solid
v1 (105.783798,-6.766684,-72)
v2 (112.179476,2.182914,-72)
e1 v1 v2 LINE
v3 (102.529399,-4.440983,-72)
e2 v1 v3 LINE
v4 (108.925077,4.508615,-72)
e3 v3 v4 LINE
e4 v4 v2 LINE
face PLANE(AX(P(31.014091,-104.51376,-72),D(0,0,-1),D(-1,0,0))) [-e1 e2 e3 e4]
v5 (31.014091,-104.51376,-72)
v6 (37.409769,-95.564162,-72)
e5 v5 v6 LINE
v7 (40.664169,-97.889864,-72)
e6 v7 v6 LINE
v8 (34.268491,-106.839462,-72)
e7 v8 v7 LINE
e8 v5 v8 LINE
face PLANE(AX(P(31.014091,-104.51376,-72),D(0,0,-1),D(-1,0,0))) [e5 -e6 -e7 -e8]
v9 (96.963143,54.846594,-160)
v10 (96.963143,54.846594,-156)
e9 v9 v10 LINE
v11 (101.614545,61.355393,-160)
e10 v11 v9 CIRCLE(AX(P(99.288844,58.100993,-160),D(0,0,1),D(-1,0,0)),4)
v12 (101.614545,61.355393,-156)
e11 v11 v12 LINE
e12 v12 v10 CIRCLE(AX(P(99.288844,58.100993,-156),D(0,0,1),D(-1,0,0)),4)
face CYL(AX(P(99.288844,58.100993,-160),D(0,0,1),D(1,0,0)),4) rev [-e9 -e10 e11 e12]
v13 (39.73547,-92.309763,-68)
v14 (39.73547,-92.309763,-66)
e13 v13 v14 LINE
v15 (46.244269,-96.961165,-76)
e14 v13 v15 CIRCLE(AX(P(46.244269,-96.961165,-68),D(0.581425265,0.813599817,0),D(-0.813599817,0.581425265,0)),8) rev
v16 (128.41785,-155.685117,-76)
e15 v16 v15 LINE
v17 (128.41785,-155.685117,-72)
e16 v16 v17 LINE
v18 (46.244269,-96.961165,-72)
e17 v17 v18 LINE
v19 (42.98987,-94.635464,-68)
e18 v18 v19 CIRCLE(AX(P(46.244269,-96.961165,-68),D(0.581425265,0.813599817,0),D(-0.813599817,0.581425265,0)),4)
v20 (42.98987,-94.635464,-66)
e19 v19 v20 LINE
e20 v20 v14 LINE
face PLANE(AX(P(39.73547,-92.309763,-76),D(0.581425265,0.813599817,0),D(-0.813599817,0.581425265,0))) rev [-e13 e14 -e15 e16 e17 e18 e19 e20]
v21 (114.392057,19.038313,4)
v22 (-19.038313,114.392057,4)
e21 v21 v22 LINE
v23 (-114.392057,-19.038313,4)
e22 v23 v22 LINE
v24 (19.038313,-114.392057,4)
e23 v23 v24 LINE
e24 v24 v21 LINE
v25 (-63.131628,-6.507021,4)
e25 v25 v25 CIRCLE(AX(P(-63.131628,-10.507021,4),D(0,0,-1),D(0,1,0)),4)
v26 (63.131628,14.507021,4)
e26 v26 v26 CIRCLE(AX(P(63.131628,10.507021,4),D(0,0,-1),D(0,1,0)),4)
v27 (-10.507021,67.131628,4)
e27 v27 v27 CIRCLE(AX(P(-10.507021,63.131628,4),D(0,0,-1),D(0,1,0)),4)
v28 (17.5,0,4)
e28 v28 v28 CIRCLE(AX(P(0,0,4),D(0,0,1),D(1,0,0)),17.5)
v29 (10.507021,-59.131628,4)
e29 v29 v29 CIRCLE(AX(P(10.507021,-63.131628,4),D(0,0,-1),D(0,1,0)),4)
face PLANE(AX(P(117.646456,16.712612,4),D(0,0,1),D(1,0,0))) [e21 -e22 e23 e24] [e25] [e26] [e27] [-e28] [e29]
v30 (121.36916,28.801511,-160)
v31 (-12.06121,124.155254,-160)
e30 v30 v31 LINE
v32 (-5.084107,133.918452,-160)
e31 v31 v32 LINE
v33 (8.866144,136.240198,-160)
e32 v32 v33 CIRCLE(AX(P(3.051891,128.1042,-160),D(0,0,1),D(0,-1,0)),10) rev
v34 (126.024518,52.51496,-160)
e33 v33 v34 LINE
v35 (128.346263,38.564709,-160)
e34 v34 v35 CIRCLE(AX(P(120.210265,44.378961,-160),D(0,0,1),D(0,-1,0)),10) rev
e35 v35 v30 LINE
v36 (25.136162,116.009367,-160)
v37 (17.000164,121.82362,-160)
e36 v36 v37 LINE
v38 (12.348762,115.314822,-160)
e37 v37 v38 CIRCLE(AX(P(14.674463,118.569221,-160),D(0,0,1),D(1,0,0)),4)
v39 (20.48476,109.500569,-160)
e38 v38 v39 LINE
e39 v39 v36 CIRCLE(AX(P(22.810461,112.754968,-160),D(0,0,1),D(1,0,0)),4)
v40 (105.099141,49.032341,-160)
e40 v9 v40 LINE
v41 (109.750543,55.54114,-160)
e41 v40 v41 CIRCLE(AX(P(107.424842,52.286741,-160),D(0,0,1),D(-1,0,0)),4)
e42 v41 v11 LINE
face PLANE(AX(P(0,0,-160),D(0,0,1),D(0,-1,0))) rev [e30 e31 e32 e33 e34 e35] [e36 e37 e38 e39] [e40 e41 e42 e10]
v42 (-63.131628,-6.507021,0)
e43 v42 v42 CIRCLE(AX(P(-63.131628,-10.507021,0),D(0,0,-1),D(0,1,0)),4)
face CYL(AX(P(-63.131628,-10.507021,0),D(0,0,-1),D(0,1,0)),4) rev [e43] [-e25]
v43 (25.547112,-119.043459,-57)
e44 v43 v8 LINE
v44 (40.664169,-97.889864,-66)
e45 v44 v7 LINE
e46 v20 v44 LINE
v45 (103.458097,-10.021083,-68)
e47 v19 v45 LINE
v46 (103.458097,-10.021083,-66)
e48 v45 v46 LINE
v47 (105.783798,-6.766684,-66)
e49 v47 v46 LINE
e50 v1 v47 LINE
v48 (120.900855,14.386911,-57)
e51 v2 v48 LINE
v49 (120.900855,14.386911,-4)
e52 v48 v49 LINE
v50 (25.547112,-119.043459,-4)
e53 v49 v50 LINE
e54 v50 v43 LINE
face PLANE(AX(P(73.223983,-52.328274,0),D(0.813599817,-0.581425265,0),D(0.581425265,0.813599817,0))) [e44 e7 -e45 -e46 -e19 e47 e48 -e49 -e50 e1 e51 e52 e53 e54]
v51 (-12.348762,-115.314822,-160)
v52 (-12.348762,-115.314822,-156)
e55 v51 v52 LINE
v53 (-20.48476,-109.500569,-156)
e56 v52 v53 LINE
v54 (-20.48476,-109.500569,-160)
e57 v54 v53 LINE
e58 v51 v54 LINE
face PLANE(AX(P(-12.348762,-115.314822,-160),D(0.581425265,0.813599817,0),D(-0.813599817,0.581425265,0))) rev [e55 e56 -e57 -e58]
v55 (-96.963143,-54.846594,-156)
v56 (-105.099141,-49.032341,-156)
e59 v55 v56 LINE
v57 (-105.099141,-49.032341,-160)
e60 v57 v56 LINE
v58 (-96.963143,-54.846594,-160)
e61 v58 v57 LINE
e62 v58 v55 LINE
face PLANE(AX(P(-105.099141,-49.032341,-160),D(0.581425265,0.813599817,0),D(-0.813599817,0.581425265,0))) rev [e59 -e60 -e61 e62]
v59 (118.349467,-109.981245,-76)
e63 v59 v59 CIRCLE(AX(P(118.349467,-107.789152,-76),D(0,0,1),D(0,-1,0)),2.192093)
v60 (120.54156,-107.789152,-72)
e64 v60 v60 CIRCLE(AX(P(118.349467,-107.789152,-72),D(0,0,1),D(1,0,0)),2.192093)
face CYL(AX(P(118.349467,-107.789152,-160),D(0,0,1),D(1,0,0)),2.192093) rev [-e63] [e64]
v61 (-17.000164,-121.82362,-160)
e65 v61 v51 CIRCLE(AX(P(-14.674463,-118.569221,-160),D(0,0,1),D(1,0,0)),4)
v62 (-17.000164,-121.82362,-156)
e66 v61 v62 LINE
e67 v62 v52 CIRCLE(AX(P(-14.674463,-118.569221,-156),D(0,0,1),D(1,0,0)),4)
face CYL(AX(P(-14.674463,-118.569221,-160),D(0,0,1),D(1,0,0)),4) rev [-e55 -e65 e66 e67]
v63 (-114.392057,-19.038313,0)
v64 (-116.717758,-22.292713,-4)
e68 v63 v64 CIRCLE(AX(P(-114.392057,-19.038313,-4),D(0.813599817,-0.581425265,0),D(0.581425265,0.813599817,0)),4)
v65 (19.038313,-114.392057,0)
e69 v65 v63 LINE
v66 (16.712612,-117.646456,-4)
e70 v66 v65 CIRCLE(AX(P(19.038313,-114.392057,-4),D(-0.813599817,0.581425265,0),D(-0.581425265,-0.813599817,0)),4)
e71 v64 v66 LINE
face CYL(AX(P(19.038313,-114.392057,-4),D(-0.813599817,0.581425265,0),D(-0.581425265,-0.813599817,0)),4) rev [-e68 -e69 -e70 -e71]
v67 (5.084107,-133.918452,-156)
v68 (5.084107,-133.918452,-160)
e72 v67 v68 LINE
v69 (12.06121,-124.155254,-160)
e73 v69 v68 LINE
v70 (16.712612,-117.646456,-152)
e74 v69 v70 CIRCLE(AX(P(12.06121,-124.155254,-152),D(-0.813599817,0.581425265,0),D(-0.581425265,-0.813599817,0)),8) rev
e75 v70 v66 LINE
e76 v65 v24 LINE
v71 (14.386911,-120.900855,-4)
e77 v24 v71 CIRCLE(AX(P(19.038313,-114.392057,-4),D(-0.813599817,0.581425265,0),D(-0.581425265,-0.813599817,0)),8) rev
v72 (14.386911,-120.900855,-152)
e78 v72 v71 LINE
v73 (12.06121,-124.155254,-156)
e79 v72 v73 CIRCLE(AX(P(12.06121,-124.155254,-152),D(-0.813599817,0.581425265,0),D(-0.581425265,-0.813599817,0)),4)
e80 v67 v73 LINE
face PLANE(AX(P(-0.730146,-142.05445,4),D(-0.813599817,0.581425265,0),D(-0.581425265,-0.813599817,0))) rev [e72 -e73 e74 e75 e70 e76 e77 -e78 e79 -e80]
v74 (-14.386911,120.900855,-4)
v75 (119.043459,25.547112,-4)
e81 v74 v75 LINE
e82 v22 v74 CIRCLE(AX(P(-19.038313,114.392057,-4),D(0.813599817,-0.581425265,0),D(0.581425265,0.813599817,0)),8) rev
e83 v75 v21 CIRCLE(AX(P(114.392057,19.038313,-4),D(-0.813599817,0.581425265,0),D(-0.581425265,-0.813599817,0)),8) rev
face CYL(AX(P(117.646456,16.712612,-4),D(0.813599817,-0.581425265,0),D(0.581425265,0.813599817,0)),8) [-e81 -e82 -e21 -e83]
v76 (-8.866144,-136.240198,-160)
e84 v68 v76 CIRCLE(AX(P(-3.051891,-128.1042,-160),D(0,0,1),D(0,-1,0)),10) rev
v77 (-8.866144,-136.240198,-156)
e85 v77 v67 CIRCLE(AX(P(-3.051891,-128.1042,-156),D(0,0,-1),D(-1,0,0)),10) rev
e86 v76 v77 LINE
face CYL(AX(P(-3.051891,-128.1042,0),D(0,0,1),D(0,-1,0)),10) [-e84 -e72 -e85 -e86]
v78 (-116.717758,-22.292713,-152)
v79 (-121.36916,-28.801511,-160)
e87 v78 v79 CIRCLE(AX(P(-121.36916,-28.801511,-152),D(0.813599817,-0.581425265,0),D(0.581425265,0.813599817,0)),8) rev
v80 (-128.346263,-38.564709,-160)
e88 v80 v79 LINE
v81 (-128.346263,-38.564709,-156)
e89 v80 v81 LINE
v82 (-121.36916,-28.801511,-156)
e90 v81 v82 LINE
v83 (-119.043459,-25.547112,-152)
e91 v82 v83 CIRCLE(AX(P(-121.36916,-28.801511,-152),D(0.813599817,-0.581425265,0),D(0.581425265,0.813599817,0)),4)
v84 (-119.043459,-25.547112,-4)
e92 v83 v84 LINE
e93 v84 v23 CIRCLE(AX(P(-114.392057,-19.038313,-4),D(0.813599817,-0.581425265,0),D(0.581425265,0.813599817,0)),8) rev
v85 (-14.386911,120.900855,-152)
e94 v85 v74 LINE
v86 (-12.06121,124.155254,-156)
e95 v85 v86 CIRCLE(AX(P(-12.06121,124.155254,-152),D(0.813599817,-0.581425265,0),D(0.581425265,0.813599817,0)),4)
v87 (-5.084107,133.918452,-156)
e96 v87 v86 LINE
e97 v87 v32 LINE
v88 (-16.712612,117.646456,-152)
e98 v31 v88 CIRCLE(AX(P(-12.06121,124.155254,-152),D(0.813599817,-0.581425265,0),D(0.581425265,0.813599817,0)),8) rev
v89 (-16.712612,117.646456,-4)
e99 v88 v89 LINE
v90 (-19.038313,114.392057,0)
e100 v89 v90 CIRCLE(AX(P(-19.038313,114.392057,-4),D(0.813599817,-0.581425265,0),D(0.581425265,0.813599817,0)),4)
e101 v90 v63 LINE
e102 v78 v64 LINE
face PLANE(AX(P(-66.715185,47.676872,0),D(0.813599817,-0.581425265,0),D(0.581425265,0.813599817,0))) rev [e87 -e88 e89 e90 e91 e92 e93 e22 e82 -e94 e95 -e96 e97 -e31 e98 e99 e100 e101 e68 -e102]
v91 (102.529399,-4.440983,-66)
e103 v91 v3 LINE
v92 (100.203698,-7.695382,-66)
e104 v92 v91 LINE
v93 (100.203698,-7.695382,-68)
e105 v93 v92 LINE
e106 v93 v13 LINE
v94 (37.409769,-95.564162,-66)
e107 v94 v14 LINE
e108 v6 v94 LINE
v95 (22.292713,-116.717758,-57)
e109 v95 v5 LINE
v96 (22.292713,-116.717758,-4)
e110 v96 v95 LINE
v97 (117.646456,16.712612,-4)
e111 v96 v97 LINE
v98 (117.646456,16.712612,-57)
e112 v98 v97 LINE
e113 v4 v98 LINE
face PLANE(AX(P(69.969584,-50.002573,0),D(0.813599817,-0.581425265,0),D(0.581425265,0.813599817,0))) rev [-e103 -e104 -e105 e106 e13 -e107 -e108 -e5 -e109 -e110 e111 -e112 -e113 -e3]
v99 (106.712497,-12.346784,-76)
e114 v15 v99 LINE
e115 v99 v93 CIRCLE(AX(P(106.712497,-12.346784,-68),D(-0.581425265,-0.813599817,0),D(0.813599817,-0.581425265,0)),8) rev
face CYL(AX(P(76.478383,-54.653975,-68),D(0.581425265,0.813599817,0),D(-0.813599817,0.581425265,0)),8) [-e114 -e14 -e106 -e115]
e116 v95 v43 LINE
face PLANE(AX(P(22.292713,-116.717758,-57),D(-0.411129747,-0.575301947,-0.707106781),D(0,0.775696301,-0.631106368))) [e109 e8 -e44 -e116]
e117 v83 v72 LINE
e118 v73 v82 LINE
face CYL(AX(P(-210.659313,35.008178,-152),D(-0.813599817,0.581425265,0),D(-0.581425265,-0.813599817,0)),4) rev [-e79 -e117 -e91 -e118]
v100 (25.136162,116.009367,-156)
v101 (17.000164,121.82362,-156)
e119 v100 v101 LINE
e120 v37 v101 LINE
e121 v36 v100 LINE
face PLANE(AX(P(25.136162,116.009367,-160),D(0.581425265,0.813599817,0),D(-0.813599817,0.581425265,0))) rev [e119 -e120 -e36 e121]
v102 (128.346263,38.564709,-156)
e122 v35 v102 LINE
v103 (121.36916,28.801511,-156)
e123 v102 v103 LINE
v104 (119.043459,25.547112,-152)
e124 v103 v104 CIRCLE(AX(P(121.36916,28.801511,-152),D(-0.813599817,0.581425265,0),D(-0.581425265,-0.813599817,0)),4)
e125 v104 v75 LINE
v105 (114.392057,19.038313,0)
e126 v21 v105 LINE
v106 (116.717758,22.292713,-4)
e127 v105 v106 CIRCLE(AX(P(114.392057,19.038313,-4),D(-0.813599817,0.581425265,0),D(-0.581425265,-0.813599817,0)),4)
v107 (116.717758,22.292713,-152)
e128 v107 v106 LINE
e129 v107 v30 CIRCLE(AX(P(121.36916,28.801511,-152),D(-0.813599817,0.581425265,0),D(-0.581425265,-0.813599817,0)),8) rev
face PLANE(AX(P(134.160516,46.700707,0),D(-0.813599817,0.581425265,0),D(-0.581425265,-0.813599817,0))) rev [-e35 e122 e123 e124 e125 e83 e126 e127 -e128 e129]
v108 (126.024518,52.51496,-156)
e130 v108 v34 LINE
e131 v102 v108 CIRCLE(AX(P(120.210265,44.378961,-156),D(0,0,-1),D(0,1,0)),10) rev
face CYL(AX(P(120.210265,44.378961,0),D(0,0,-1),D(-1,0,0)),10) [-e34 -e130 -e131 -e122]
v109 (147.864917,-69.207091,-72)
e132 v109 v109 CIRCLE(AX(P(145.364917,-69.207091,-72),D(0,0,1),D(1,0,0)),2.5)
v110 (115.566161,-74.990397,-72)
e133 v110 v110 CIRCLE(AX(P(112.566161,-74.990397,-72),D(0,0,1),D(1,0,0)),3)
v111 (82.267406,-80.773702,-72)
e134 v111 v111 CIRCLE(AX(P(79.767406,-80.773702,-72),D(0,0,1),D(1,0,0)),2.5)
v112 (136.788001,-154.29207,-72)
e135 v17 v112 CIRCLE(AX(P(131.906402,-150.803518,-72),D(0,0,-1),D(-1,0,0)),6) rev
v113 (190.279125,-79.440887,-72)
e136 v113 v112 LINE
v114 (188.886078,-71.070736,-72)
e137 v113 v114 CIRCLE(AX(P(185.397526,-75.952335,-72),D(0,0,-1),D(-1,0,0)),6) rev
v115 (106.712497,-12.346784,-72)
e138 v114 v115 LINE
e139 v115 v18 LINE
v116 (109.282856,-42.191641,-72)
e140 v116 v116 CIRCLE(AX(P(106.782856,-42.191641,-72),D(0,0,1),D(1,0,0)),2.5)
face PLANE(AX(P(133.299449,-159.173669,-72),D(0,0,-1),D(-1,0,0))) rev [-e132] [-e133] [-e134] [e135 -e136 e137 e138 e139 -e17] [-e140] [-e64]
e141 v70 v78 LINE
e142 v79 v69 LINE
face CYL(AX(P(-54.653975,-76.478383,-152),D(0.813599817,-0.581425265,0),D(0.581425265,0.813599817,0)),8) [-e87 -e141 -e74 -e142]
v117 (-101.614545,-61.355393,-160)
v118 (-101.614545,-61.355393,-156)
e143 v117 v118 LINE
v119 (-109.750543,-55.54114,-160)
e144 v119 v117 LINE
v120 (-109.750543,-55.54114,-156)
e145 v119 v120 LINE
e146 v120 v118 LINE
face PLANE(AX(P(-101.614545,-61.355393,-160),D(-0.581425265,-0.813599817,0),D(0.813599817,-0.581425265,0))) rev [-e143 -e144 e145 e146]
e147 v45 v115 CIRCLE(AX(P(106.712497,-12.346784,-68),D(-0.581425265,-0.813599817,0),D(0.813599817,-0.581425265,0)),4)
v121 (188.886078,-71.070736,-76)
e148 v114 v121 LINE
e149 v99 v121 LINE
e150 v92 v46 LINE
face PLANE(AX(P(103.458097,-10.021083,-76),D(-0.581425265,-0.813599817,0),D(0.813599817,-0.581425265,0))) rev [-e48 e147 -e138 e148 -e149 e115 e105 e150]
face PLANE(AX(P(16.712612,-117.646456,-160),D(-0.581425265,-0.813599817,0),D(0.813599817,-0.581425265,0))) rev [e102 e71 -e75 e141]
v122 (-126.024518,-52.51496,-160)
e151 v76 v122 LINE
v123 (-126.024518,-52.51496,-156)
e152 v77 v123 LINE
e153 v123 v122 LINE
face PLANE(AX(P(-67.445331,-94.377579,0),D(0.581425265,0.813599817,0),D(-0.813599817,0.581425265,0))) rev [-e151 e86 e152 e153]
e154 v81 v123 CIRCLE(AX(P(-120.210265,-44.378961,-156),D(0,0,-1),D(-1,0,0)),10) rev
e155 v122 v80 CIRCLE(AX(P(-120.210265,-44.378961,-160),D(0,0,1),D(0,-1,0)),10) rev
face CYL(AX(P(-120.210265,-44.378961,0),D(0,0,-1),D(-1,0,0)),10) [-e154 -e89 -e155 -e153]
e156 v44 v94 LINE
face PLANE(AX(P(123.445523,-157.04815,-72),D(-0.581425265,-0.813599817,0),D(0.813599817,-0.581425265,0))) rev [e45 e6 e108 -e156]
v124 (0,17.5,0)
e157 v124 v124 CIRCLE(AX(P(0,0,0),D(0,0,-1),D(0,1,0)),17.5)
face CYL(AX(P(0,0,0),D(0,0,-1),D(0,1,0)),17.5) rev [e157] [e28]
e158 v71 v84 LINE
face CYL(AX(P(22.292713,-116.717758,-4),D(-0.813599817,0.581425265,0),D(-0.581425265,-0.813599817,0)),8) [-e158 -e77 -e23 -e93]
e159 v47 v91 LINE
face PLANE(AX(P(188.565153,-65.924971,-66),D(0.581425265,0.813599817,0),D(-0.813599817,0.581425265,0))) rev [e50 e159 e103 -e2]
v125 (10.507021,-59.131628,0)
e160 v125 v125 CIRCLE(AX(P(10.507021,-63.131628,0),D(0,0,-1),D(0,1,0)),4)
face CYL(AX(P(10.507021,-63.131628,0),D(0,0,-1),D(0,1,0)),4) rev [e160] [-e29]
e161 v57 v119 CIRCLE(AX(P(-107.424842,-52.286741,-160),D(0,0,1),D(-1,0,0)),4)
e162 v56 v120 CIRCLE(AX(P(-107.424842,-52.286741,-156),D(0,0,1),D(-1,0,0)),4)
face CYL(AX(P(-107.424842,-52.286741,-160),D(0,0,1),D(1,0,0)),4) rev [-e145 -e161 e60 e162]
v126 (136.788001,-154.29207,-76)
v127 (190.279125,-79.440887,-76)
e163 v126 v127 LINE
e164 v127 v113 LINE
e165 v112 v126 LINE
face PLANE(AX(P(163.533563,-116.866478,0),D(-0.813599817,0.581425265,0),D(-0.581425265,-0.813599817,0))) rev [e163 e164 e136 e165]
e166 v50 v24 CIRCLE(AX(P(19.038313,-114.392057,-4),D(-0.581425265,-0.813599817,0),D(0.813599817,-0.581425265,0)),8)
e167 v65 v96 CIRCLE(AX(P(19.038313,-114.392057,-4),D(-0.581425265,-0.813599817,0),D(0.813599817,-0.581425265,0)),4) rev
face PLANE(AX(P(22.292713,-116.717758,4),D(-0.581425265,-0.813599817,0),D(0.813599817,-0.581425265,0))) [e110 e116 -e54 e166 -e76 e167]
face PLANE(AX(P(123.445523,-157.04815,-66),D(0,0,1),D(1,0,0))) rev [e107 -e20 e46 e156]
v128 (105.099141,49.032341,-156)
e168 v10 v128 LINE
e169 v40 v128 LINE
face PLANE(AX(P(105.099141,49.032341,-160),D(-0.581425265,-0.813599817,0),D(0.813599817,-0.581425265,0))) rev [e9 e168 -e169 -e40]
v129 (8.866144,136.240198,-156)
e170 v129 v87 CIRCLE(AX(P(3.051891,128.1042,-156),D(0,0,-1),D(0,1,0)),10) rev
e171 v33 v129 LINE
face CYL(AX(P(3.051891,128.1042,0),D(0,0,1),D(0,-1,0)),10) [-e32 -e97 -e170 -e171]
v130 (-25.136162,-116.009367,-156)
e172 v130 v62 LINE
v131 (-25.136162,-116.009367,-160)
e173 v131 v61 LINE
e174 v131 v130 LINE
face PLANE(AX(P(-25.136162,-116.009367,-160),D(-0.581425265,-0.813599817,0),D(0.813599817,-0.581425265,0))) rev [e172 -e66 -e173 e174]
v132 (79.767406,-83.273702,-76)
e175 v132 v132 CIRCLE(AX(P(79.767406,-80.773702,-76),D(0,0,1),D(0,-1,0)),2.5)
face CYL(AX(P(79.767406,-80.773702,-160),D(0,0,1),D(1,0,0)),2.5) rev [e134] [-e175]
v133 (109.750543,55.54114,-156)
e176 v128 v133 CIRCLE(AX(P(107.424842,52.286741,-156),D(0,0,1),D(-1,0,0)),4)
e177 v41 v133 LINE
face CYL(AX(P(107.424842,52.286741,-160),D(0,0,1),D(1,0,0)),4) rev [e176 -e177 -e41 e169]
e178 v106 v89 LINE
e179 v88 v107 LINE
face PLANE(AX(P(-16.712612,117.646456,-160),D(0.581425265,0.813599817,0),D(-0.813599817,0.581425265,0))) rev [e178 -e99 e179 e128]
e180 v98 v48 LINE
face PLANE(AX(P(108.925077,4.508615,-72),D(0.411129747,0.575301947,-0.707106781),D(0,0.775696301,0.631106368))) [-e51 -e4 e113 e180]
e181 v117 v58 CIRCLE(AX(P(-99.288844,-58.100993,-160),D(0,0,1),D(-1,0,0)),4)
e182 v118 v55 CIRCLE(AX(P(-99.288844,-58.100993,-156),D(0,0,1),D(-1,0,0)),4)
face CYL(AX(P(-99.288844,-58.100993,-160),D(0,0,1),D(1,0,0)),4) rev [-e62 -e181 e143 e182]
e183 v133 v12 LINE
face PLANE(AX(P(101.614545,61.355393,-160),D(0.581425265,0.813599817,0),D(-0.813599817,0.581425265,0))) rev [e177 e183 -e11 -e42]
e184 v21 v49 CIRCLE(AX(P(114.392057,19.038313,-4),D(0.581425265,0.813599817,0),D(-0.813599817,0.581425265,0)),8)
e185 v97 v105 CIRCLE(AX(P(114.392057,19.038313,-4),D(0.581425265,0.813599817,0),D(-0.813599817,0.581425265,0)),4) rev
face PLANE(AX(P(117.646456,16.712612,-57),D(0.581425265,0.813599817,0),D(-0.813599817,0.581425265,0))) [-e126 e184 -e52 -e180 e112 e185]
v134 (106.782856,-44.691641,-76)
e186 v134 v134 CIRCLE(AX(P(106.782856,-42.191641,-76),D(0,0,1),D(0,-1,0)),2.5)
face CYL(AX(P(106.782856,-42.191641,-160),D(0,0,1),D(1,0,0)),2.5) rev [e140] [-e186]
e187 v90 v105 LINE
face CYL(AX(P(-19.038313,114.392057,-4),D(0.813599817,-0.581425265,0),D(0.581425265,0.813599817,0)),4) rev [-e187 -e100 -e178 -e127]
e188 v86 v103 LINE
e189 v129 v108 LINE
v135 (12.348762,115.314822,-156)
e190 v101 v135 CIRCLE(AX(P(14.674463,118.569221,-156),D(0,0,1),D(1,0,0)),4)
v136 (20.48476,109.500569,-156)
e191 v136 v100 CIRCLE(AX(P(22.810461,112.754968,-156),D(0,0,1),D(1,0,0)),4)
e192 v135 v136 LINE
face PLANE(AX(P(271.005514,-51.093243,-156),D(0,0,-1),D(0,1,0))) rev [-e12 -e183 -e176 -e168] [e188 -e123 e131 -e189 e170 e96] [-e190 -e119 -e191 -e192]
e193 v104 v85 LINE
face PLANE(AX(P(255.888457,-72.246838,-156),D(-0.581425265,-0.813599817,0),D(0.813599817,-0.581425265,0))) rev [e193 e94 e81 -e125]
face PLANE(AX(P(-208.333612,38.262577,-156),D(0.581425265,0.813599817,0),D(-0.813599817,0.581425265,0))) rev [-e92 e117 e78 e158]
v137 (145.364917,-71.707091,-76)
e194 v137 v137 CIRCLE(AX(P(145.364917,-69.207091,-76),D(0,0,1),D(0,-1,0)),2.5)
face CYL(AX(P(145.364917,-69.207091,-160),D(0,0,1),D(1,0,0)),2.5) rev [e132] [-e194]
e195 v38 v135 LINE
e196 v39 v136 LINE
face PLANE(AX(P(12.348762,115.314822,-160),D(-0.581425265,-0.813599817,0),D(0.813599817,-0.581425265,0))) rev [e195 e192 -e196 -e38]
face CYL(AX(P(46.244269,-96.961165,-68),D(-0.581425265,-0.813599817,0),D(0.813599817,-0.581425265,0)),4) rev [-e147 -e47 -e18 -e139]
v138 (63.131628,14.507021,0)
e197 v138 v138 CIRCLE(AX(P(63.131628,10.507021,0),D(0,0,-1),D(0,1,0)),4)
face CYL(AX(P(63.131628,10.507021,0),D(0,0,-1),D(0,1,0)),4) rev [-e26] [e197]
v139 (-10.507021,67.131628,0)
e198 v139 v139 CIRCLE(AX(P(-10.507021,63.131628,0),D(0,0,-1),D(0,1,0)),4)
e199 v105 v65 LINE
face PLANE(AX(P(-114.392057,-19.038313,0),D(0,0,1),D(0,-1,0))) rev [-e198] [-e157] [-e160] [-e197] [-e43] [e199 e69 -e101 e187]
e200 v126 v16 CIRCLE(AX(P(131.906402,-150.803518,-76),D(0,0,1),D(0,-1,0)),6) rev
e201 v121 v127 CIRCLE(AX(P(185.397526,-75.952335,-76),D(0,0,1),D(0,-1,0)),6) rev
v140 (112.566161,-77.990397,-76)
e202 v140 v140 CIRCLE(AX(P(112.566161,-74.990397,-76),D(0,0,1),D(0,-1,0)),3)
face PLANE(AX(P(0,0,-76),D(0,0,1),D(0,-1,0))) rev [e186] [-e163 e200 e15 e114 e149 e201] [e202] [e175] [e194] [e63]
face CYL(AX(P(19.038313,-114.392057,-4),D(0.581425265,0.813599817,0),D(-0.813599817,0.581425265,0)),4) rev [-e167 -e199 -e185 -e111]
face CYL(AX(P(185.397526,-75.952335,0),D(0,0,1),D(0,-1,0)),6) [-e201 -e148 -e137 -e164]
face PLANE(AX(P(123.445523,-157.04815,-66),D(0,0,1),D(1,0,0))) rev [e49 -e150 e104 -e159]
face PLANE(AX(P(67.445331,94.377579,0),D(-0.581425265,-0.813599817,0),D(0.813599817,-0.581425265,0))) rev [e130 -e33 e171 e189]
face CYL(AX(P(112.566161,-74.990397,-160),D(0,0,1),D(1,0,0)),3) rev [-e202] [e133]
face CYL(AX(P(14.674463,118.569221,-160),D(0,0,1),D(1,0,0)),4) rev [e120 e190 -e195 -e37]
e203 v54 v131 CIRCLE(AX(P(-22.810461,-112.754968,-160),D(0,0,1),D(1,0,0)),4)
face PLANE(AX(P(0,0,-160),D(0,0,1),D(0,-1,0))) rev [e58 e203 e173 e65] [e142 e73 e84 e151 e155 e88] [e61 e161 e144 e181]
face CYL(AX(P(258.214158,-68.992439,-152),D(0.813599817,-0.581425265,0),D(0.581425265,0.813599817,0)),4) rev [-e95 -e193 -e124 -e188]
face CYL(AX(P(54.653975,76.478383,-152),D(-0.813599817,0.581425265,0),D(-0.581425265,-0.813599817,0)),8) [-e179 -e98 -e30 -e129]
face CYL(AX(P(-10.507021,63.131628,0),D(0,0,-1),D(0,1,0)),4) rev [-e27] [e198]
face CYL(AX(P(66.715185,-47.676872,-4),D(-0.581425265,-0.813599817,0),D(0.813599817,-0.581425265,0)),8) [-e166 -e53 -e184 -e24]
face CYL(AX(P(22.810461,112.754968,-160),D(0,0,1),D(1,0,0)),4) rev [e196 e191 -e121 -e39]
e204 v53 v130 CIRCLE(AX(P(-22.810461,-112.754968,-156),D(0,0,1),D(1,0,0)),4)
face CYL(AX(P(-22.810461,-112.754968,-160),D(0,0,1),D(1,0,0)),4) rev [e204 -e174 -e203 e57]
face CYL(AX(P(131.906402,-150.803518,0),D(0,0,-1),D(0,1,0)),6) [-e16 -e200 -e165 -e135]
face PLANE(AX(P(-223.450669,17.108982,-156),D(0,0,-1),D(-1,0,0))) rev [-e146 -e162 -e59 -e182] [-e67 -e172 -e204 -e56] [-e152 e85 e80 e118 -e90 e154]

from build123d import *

# Parameters (mm, degrees)
BOSS_EXTRUDE1_DEPTH               = 3.999999999999827
BOSS_EXTRUDE2_DEPTH               = 168.00000000000006
BOSS_EXTRUDE3_DEPTH               = 33.999999999999844
BOSS_EXTRUDE4_DEPTH               = 160.00000000000026
BOSS_EXTRUDE5_DEPTH               = 33.99999999999976
BOSS_EXTRUDE6_DEPTH               = 160
CUT_EXTRUDE1_DEPTH                = 323.7305344129504
BOSS_EXTRUDE7_DEPTH               = 10
BOSS_EXTRUDE8_DEPTH               = 110.99999999999987
CUT_EXTRUDE2_DEPTH                = 320.2945688597946
CUT_EXTRUDE3_DEPTH                = 370.10495441994317
SKETCH12_R                        = 3.0000000000309623
SKETCH12_R_2                      = 2.500000000030963
SKETCH12_R_3                      = 2.192092842094092
SKETCH12_R_4                      = 2.500000000030976
CUT_EXTRUDE4_DEPTH                = 266.75584548482374
CUT_EXTRUDE11_DEPTH               = 298.4595256658518
TAP_DRILL_FOR_M33_HELICOIL1_D     = 35
TAP_DRILL_FOR_M33_HELICOIL1_DEPTH = 25
TAP_DRILL_FOR_M33_HELICOIL1_TIP   = 10.515060832982305
F_8_0_8_DIAMETER_HOLE1_D          = 8
FILLET1_R                         = 3.9999999999999907
FILLET2_R                         = 6.000000000000003
FILLET3_R                         = 8.000000000000018
FILLET4_R                         = 10.000000000000002


with BuildPart() as part:
    # Sketch1 → Boss-Extrude1 (new body)
    with BuildSketch(Plane(origin=(73.22398349105087, -52.32827382689312, 1.9235e-13), x_dir=(0.581425264743257, 0.813599816567232, 0), z_dir=(0.813599816567232, -0.581425264743257, 2.1335369341433303e-15))):
        Polygon((-81.99999999999993, -57.00000000000027), (-67.00000000000007, -72.00000000000006), (67.00000000000001, -72.00000000000007), (82.00000000000031, -57.00000000000008), (82.00000000000031, 3.99999999999992), (-81.99999999999994, 3.999999999999898), align=None)
    extrude(amount=-BOSS_EXTRUDE1_DEPTH)

    # Sketch2 → Boss-Extrude2 (add)
    with BuildSketch(Plane(origin=(69.96958422478208, -50.002572767920185, 1.8081e-13), x_dir=(1.3e-16, -9e-17, 1), z_dir=(-0.8135998165672335, 0.581425264743255, 0))):
        Polygon((4.000000000000034, 82.00000000000027), (3.9999999999999107, -82.0000000000003), (-3.307e-14, -82.00000000000033), (3.0771e-13, 81.99999999999974), align=None)
    extrude(amount=BOSS_EXTRUDE2_DEPTH)

    # Sketch3 → Boss-Extrude3 (add)
    with BuildSketch(Plane(origin=(47.67687170894727, 66.71518495851329, 4e-17), x_dir=(-0.8135998165672319, 0.5814252647432572, 0), z_dir=(0.5814252647432572, 0.8135998165672319, 1.1186917952113738e-15))):
        Polygon((81.99999999999982, 1.8349e-13), (-81.9999999999999, 3.1461e-13), (-81.99999999999989, 4.000000000000039), (81.99999999999977, 3.99999999999991), align=None)
    extrude(amount=BOSS_EXTRUDE3_DEPTH)

    # Sketch4 → Boss-Extrude4 (add)
    with BuildSketch(Plane(origin=(0, 0, 0), x_dir=(-1, 0, -1.08e-15), z_dir=(1.08e-15, 1.78e-15, -1))):
        Polygon((-116.71775772643305, 22.292712515834978), (-134.16051566873062, 46.700707012851765), (-0.7301457517048301, 142.0544504307457), (16.712612190592758, 117.64645593372894), align=None)
    extrude(amount=BOSS_EXTRUDE4_DEPTH)

    # Sketch5 → Boss-Extrude5 (add)
    with BuildSketch(Plane(origin=(-47.67687170894706, -66.71518495851302, -3.148e-14), x_dir=(0.8135998165672321, -0.581425264743257, 0), z_dir=(-0.581425264743257, -0.8135998165672321, 0))):
        Polygon((-81.99999999999984, -4.049e-14), (-81.99999999999986, 3.9999999999999343), (82.00000000000009, 3.999999999999887), (82.00000000000007, -1.4474e-13), align=None)
    extrude(amount=BOSS_EXTRUDE5_DEPTH)

    # Sketch6 → Boss-Extrude6 (add)
    with BuildSketch(Plane(origin=(0, 0, 0), x_dir=(-1, 0, -1.08e-15), z_dir=(1.08e-15, 1.78e-15, -1))):
        Polygon((116.71775772643291, -22.292712515834953), (134.1605156687307, -46.70070701285208), (0.7301457517046283, -142.05445043074596), (-16.712612190593134, -117.64645593372893), align=None)
    extrude(amount=BOSS_EXTRUDE6_DEPTH)

    # Sketch7 → Cut-Extrude1 (cut, through all)
    with BuildSketch(Plane(origin=(69.96958422478208, -50.002572767920185, 1.8081e-13), x_dir=(1.3e-16, -9e-17, 1), z_dir=(-0.8135998165672335, 0.581425264743255, 0))):
        Polygon((-72.00000000000006, 55.999999999999545), (-72.00000000000001, -56.00000000000032), (-66, -56.0000000000003), (-66.0000000000001, 55.99999999999955), align=None)
    extrude(amount=-CUT_EXTRUDE1_DEPTH, mode=Mode.SUBTRACT)

    # Sketch8 → Boss-Extrude7 (add)
    with BuildSketch(Plane(origin=(-4.175e-14, -4.053e-14, -65.99999999999984), x_dir=(-1, 0, 6e-16), z_dir=(-6e-16, -5.6e-16, -1))):
        Polygon((-42.98986972440265, -94.63546428838991), (-103.45809725770025, -10.021083365397134), (-100.20369799143137, -7.695382306424205), (-39.73547045813379, -92.30976322941699), align=None)
    extrude(amount=BOSS_EXTRUDE7_DEPTH)

    # Sketch9 → Boss-Extrude8 (add)
    with BuildSketch(Plane(origin=(73.22398349105089, -52.328273826893124, 1.8922e-13), x_dir=(-1.3e-16, 9e-17, -1), z_dir=(0.8135998165672335, -0.581425264743255, 0))):
        Polygon((75.99999999999976, 51.99999999999975), (75.99999999999973, -52.00000000000022), (71.99999999999974, -52.00000000000025), (71.99999999999974, 51.99999999999975), align=None)
    extrude(amount=BOSS_EXTRUDE8_DEPTH)

    # Sketch10 → Cut-Extrude2 (cut, through all)
    with BuildSketch(Plane(origin=(66.7151849585131, -47.676871708947125, 0), x_dir=(-1.3e-15, 9.3e-16, -1), z_dir=(0.813599816567232, -0.581425264743257, -1.5973110435533651e-15))):
        Polygon((-4.000000000000134, -115.99999999999963), (155.9999999999999, -115.99999999999989), (155.9999999999999, -89.99999999999983), (-4.0000000000001315, -90.00000000000009), align=None)
    extrude(amount=-CUT_EXTRUDE2_DEPTH, mode=Mode.SUBTRACT)

    # Sketch11 → Cut-Extrude3 (cut, through all)
    with BuildSketch(Plane(origin=(-66.71518495851308, 47.67687170894687, -3.556e-14), x_dir=(5.88e-15, -4.2e-15, 1), z_dir=(-0.8135998165672317, 0.5814252647432574, 7.22907031221184e-15))):
        Polygon((-156.00000000000057, 116.00000000000004), (-156.0000000000006, 90.00000000000027), (3.9999999999994076, 89.99999999999994), (3.999999999999411, 116.00000000000033), align=None)
    extrude(amount=-CUT_EXTRUDE3_DEPTH, mode=Mode.SUBTRACT)

    # Sketch12 → Cut-Extrude4 (cut, through all)
    with BuildSketch(Plane.XY.offset(-71.99999999999953)):
        with Locations((112.5661613861435, -74.99039654371168)):
            Circle(SKETCH12_R)
        with Locations((79.7674056670706, -80.77370211065036)):
            Circle(SKETCH12_R_2)
        with Locations((118.34946695308224, -107.78915226278458)):
            Circle(SKETCH12_R_3)
        with Locations((145.3649171052164, -69.20709097677297)):
            Circle(SKETCH12_R_2)
        with Locations((106.78285581920481, -42.19164082463879)):
            Circle(SKETCH12_R_4)
    extrude(amount=-CUT_EXTRUDE4_DEPTH, mode=Mode.SUBTRACT)

    # Sketch19 → Cut-Extrude11 (cut, through all)
    with BuildSketch(Plane.XY.offset(-155.99999999999974)):
        with BuildLine():
            Line((-12.348762194736109, -115.31482156365595), (-20.484760360408547, -109.50056891622312))
            ThreePointArc((-20.484760360408547, -109.50056891622312), (-26.064860685650135, -110.42926712351874), (-25.136162478354784, -116.00936744876103))
            Line((-25.136162478354784, -116.00936744876103), (-17.00016431268235, -121.82362009619386))
            ThreePointArc((-17.00016431268235, -121.82362009619386), (-11.420063987440384, -120.89492188889805), (-12.348762194736109, -115.31482156365595))
        make_face()
        with BuildLine():
            Line((-105.09914128340088, -49.032341382924876), (-96.96314311772822, -54.84659403035742))
            ThreePointArc((-96.96314311772822, -54.84659403035742), (-96.03444491043223, -60.42669435559925), (-101.61454523567414, -61.355392562895375))
            Line((-101.61454523567414, -61.355392562895375), (-109.75054340134677, -55.54113991546282))
            ThreePointArc((-109.75054340134677, -55.54113991546282), (-110.6792416086428, -49.961039590220906), (-105.09914128340088, -49.032341382924876))
        make_face()
        with BuildLine():
            Line((101.61454523567473, 61.35539256289546), (109.75054340134734, 55.54113991546285))
            ThreePointArc((109.75054340134734, 55.54113991546285), (110.67924160864335, 49.961039590220956), (105.09914128340134, 49.0323413829248))
            Line((105.09914128340134, 49.0323413829248), (96.96314311772869, 54.84659403035741))
            ThreePointArc((96.96314311772869, 54.84659403035741), (96.0344449104327, 60.42669435559949), (101.61454523567473, 61.35539256289546))
        make_face()
        with BuildLine():
            Line((25.136162478355374, 116.00936744876108), (17.000164312682962, 121.82362009619392))
            ThreePointArc((17.000164312682962, 121.82362009619392), (11.420063987440981, 120.89492188889814), (12.348762194736782, 115.31482156365615))
            Line((12.348762194736782, 115.31482156365615), (20.484760360409194, 109.50056891622333))
            ThreePointArc((20.484760360409194, 109.50056891622333), (26.064860685651034, 110.4292671235191), (25.136162478355374, 116.00936744876108))
        make_face()
    extrude(amount=-CUT_EXTRUDE11_DEPTH, mode=Mode.SUBTRACT)

    # Tap Drill for M33 Helicoil1
    with Locations(Plane(origin=(0, 0, 0), x_dir=(-1, 0, -1.08e-15), z_dir=(1.08e-15, 1.78e-15, -1))):
        with Locations((0, 0)):
            Hole(TAP_DRILL_FOR_M33_HELICOIL1_D / 2, depth=TAP_DRILL_FOR_M33_HELICOIL1_DEPTH)
            with Locations((0, 0, -(TAP_DRILL_FOR_M33_HELICOIL1_DEPTH + TAP_DRILL_FOR_M33_HELICOIL1_TIP / 2))):  # 118° drill point
                Cone(0, TAP_DRILL_FOR_M33_HELICOIL1_D / 2, TAP_DRILL_FOR_M33_HELICOIL1_TIP, mode=Mode.SUBTRACT)

    # Ø8.0 (8) Diameter Hole1 (through all)
    with Locations(Plane(origin=(0, 0, 0), x_dir=(-1, 0, -1.08e-15), z_dir=(1.08e-15, 1.78e-15, -1))):
        with Locations((10.507020801, 63.131628475), (63.131628475, -10.507020801), (-63.131628475, 10.507020801), (-10.507020801, -63.131628475)):
            Hole(F_8_0_8_DIAMETER_HOLE1_D / 2)

    # Fillet1
    fillet1_edges = [part.edges().sort_by_distance(p)[0] for p in [
        (-52.32827382689296, -73.22398349105077, -155.99999999999974),
        (50.00257276792015, 69.96958422478195, 1.787e-13),
        (-50.00257276791989, -69.96958422478194, -1.787e-13),
        (73.22398349105073, -52.32827382689332, -71.99999999999956),
        (69.96958422478191, -50.00257276792043, 3.1813e-13),
        (52.328273826892875, 73.2239834910511, -156.00000000000122),
    ]]
    fillet(fillet1_edges, radius=FILLET1_R)

    # Fillet2
    fillet2_edges = [part.edges().sort_by_distance(p)[0] for p in [
        (193.7676768966628, -74.55928775189841, -73.99999999999957),
        (133.2994493633643, -159.17366867489068, -73.99999999999957),
    ]]
    fillet(fillet2_edges, radius=FILLET2_R)

    # Fillet3
    fillet3_edges = [part.edges().sort_by_distance(p)[0] for p in [
        (-50.002572767919716, -69.96958422478166, -160.00000000000017),
        (-52.32827382689307, -73.223983491051, 4.000000000000262),
        (73.22398349105097, -52.32827382689296, 4.000000000000101),
        (69.96958422478254, -50.00257276792064, -75.99999999999986),
        (50.00257276792032, 69.96958422478224, -160.00000000000009),
        (52.32827382689298, 73.22398349105063, 3.999999999998779),
    ]]
    fillet(fillet3_edges, radius=FILLET3_R)

    # Fillet4
    fillet4_edges = [part.edges().sort_by_distance(p)[0] for p in [
        (-0.7301457517044567, -142.05445043074567, -158.00000000000006),
        (134.1605156687308, 46.70070701285205, -158.0000000000009),
        (0.7301457517050038, 142.054450430746, -158.00000000000028),
        (-134.16051566873054, -46.700707012851794, -157.99999999999994),
    ]]
    fillet(fillet4_edges, radius=FILLET4_R)


solid = part.part
